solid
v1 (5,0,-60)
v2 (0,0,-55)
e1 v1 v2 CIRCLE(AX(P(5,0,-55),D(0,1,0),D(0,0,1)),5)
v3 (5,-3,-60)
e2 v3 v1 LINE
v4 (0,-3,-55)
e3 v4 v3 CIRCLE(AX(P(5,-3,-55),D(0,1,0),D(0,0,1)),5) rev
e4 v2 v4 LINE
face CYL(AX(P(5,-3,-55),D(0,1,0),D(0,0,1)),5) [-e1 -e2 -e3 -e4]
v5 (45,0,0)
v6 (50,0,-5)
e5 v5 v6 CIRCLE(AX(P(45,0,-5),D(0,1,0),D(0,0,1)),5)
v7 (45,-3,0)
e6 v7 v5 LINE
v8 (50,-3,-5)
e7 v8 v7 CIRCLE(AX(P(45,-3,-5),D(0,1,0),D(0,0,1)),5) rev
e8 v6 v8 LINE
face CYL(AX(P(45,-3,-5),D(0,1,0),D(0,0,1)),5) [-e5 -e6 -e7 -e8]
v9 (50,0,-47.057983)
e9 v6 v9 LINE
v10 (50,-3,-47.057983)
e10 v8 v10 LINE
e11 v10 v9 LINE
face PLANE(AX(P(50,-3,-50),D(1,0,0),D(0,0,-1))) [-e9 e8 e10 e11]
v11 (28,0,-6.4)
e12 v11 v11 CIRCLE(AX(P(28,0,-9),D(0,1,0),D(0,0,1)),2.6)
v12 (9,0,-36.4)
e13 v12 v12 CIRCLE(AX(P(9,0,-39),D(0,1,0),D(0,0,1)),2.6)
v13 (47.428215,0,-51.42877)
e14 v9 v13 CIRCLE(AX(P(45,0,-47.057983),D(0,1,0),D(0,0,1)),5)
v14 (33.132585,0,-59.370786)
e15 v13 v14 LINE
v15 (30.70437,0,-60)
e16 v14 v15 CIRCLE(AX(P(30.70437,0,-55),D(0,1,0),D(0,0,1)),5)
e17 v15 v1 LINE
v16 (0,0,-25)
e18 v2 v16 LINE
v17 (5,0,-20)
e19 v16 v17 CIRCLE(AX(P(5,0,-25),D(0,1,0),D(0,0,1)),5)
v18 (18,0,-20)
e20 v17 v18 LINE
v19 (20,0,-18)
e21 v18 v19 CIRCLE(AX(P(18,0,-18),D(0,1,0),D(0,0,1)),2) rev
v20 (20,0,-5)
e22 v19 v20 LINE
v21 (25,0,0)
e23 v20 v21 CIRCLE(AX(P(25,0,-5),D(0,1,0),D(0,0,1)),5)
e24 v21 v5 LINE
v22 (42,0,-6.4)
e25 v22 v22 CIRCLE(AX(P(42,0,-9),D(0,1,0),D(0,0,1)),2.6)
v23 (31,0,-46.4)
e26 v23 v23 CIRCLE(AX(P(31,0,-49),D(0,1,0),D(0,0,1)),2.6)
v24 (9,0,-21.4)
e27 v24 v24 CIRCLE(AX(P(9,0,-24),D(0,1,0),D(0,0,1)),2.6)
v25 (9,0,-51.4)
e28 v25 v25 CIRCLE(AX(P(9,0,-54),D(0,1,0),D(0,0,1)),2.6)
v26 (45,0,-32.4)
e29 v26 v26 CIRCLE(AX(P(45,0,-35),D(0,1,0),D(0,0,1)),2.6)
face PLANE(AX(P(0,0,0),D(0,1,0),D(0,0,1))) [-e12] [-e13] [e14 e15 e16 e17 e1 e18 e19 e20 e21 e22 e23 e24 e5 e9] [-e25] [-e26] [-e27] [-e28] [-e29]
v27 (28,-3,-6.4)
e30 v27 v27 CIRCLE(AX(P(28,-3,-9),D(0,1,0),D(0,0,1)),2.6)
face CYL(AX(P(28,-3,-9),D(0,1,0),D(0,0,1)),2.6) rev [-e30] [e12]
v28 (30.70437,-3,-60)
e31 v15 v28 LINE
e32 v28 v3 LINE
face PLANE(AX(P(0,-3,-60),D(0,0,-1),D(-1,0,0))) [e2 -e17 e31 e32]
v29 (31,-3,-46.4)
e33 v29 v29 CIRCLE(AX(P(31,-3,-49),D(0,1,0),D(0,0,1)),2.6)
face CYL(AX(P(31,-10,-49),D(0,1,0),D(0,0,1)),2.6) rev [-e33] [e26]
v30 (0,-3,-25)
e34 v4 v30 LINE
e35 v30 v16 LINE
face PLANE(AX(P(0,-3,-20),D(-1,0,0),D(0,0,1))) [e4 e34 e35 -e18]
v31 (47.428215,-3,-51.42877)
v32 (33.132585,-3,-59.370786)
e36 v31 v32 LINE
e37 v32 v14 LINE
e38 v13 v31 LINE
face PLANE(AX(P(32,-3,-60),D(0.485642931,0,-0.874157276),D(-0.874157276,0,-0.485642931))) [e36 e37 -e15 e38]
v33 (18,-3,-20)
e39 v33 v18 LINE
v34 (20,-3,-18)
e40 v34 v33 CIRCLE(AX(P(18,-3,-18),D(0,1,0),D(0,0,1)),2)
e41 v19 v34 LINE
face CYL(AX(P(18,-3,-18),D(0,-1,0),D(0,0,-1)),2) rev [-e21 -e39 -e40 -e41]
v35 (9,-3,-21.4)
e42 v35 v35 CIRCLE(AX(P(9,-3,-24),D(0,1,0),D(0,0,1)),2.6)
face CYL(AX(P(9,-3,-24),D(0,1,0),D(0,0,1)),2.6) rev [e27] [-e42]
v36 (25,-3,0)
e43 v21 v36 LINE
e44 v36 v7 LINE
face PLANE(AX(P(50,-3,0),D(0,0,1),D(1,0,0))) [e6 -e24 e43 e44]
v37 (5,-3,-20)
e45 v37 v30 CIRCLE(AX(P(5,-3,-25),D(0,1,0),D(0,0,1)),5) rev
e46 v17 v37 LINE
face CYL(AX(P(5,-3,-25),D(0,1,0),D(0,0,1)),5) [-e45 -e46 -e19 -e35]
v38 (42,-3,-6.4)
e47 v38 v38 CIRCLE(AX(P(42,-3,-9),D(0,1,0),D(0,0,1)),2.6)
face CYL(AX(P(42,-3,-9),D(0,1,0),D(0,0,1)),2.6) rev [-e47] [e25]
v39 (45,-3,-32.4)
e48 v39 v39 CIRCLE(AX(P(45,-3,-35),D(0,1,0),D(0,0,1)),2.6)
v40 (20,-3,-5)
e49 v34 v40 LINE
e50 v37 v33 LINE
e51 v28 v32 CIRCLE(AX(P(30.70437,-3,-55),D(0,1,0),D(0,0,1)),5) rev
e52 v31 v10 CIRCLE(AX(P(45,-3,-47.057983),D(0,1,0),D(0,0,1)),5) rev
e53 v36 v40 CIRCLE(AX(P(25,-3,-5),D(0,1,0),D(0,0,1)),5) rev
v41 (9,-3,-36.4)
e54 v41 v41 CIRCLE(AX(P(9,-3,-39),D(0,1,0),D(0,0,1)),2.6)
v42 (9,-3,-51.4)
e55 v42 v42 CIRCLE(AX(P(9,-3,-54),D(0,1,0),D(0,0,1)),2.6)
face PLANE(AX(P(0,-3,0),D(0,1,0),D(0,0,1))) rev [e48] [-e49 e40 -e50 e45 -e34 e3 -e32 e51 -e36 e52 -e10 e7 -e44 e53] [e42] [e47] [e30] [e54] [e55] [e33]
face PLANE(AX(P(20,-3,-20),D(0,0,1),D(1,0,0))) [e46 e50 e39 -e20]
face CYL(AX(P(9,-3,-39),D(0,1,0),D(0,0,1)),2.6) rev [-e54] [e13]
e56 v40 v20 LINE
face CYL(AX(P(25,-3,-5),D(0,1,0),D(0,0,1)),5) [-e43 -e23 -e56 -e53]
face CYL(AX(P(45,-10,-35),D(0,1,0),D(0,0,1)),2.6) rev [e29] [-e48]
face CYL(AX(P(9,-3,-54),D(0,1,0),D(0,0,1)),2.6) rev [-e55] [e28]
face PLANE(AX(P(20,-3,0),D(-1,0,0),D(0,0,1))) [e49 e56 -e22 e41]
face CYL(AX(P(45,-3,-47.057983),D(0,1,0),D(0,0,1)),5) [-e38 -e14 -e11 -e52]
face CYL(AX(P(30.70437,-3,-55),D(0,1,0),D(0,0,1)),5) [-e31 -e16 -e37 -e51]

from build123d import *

# Parameters (mm, degrees)
SKETCH2_R          = 2.6
BASE_FLANGE1_DEPTH = 3
FILLET1_R          = 5
SKETCH3_R          = 2.6
CUT_EXTRUDE1_DEPTH = 10
FILLET2_R          = 2


# Sheet-metal steps are written as plain solids
with BuildPart() as part:
    # Sketch2 → Base-Flange1 (new body)
    with BuildSketch(Plane(origin=(0, 0, 0), x_dir=(1, 0, 0), z_dir=(0, 1, 0))):
        Polygon((0, 60), (32, 60), (50, 50), (50, 0), (20, 0), (20, 20), (0, 20), align=None)
        with Locations(Location((9, 39, 0), (0, 0, 270))):
            Circle(SKETCH2_R, mode=Mode.SUBTRACT)
        with Locations(Location((9, 24, 0), (0, 0, 270))):
            Circle(SKETCH2_R, mode=Mode.SUBTRACT)
        with Locations(Location((28, 9, 0), (0, 0, 270))):
            Circle(SKETCH2_R, mode=Mode.SUBTRACT)
        with Locations(Location((42, 9, 0), (0, 0, 270))):
            Circle(SKETCH2_R, mode=Mode.SUBTRACT)
        with Locations(Location((9, 54, 0), (0, 0, 270))):
            Circle(SKETCH2_R, mode=Mode.SUBTRACT)
    extrude(amount=-BASE_FLANGE1_DEPTH)

    # Fillet1
    fillet1_edges = [part.edges().sort_by_distance(p)[0] for p in [
        (0, -1.5, -20),
        (0, -1.5, -60),
        (32, -1.5, -60),
        (50, -1.5, -50),
        (50, -1.5, 0),
        (20, -1.5, 0),
    ]]
    fillet(fillet1_edges, radius=FILLET1_R)

    # Sketch3 → Cut-Extrude1 (cut)
    with BuildSketch(Plane(origin=(0, 0, 0), x_dir=(1, 0, 0), z_dir=(0, 1, 0))):
        with Locations(Location((45, 35, 0), (0, 0, 270))):
            Circle(SKETCH3_R)
        with Locations(Location((31, 49, 0), (0, 0, 270))):
            Circle(SKETCH3_R)
    extrude(amount=-CUT_EXTRUDE1_DEPTH, mode=Mode.SUBTRACT)

    # Fillet2
    fillet2_edges = [part.edges().sort_by_distance(p)[0] for p in [
        (20, -1.5, -20),
    ]]
    fillet(fillet2_edges, radius=FILLET2_R)


solid = part.part
